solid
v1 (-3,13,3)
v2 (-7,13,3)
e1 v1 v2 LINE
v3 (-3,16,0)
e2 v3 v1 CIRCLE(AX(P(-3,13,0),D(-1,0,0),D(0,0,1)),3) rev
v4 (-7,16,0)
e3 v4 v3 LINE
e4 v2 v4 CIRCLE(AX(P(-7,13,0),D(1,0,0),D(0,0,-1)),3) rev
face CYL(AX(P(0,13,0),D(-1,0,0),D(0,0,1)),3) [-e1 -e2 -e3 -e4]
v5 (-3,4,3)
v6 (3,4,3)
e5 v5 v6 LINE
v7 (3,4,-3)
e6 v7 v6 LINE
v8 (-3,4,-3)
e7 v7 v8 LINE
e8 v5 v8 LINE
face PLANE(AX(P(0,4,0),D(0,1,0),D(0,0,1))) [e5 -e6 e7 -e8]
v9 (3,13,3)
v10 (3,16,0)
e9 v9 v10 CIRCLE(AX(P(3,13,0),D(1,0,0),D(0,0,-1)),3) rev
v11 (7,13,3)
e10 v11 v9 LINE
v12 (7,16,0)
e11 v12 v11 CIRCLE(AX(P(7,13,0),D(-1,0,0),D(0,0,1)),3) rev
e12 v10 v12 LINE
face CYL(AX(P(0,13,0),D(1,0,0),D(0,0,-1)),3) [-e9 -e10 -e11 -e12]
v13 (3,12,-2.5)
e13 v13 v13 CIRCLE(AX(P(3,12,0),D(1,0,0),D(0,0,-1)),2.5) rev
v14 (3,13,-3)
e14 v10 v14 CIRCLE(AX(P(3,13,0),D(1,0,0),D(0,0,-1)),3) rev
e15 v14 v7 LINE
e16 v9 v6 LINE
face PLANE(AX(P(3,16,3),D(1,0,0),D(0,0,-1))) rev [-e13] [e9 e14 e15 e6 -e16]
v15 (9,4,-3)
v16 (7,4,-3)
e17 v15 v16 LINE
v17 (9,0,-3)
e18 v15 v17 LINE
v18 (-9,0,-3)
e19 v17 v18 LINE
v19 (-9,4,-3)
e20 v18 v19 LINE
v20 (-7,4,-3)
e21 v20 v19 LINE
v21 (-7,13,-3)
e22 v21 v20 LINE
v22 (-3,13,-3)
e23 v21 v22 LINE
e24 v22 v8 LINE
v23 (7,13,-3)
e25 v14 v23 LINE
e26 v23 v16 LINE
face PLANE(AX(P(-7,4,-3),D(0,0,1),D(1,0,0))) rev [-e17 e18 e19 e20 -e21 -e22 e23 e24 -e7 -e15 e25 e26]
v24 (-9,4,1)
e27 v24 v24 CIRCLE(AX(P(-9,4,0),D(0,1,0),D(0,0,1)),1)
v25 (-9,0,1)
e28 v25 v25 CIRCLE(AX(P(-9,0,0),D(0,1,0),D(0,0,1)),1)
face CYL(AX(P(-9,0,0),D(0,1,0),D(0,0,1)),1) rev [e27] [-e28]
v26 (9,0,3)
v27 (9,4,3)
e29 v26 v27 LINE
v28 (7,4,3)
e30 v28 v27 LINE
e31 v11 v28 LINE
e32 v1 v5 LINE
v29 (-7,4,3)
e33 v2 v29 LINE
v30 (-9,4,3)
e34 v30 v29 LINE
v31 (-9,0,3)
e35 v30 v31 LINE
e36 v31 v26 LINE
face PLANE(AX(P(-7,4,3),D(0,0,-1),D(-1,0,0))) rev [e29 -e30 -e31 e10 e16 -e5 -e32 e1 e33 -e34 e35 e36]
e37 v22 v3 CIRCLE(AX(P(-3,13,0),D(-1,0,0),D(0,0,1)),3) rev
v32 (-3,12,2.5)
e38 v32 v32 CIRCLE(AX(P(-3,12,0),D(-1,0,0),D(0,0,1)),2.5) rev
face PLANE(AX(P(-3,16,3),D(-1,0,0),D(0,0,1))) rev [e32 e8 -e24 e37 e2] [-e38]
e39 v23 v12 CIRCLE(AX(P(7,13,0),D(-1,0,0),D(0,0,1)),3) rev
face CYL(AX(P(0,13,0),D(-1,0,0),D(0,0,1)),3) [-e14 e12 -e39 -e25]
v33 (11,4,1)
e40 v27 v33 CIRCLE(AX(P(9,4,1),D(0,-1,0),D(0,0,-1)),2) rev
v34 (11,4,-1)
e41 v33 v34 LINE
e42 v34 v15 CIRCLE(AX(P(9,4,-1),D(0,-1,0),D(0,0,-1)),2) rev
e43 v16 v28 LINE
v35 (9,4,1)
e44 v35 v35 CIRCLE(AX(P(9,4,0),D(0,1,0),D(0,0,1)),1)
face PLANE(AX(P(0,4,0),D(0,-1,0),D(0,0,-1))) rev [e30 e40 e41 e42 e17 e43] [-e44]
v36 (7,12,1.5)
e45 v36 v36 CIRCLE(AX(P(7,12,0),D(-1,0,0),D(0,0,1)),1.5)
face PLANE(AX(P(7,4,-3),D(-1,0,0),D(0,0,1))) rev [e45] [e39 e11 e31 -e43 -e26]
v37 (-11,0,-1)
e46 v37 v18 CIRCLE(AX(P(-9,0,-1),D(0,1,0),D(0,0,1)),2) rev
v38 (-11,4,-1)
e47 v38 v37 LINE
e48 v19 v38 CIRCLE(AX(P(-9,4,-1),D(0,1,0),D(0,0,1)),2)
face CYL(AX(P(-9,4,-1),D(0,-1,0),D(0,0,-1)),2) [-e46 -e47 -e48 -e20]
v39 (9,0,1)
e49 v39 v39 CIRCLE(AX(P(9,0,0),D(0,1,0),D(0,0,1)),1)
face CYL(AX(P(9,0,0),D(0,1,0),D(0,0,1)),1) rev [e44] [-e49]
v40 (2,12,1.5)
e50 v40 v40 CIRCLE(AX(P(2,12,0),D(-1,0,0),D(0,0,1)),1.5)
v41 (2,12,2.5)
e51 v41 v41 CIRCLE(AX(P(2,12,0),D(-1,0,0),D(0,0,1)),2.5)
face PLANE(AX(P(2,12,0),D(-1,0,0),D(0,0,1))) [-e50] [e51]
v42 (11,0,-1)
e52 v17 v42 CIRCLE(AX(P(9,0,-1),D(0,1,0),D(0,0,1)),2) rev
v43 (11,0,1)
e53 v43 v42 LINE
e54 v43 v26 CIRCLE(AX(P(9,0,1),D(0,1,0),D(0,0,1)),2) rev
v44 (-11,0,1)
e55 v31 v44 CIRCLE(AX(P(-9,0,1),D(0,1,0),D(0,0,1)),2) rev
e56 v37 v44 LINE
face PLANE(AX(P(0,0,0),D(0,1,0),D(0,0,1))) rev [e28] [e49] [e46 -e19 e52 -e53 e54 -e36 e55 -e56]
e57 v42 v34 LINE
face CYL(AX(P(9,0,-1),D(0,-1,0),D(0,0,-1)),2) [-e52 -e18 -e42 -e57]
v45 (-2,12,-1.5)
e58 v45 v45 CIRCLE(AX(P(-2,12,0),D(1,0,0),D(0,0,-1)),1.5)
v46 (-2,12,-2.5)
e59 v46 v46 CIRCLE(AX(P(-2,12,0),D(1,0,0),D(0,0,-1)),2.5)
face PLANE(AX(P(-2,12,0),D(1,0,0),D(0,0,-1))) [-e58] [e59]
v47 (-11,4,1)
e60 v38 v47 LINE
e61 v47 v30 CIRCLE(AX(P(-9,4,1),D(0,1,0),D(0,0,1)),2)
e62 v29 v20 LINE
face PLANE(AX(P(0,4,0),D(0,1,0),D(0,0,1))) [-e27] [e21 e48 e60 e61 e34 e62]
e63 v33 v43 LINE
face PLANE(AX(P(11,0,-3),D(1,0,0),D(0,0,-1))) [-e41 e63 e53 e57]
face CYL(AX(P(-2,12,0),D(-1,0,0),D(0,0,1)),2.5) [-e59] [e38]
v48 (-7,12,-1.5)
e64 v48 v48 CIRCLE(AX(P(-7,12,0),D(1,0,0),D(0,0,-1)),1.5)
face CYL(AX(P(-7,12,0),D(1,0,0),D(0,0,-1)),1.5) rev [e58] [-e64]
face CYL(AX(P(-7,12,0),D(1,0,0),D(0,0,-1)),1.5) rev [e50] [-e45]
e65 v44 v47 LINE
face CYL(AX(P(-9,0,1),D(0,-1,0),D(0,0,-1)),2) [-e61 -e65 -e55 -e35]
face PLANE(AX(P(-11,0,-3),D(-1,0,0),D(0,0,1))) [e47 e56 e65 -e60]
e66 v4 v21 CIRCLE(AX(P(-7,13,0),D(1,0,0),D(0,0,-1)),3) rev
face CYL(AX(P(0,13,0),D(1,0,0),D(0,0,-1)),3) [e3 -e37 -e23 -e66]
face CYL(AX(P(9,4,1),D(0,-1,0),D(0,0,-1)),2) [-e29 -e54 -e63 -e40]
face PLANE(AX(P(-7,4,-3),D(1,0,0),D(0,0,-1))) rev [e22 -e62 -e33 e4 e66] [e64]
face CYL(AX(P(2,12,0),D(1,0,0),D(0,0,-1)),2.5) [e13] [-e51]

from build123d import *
from build123d.topology import SkipClean

# Parameters (mm, degrees)
SKETCH2_W               = 14
SKETCH2_H               = 6
BOSS_EXTRUDE1_DEPTH     = 4
SKETCH3_W               = 4
SKETCH3_H               = 6
BOSS_EXTRUDE2_DEPTH     = 12
CUT_EXTRUDE1_DEPTH      = 22.470910554
CUT_EXTRUDE1_DEPTH_BACK = 22.470910554
SKETCH4_R               = 1.5
BOSS_EXTRUDE3_START     = 1
SKETCH5_R               = 2.5
SKETCH5_R_2             = 1.5
BOSS_EXTRUDE3_DEPTH     = 1
SKETCH6_R               = 2.5
SKETCH6_R_2             = 1.5
BOSS_EXTRUDE4_DEPTH     = 1
SKETCH7_W               = 4
SKETCH7_H               = 6
SKETCH7_R               = 1
BOSS_EXTRUDE5_DEPTH     = 4
FILLET1_R               = 2
FILLET2_R               = 3


with BuildPart() as part:
    # Sketch2 → Boss-Extrude1 (new body)
    with BuildSketch(Plane(origin=(0, 0, 0), x_dir=(1, 0, 0), z_dir=(0, 1, 0))):
        Rectangle(SKETCH2_W, SKETCH2_H)
    extrude(amount=BOSS_EXTRUDE1_DEPTH)

    # Sketch3 → Boss-Extrude2 (add)
    with BuildSketch(Plane(origin=(0, 4, 0), x_dir=(1, 0, 0), z_dir=(0, 1, 0))):
        with Locations((-5, 0)):
            Rectangle(SKETCH3_W, SKETCH3_H)
        with Locations((5, 0)):
            Rectangle(SKETCH3_W, SKETCH3_H)
    extrude(amount=BOSS_EXTRUDE2_DEPTH)

    # Sketch4 → Cut-Extrude1 (cut, two sides: drawn at the far end of the back side and taken through both)
    with BuildSketch(Plane(origin=(7, 0, 0), x_dir=(0, 0, -1), z_dir=(1, 0, 0)).offset(-CUT_EXTRUDE1_DEPTH_BACK)):
        with Locations((0, 12)):
            Circle(SKETCH4_R)
    extrude(amount=CUT_EXTRUDE1_DEPTH + CUT_EXTRUDE1_DEPTH_BACK, mode=Mode.SUBTRACT)

    # Sketch5 → Boss-Extrude3 (add)
    with BuildSketch(Plane(origin=(-3, 0, 0), x_dir=(0, 0, -1), z_dir=(1, 0, 0)).offset(BOSS_EXTRUDE3_START)):
        with Locations(Location((0, 12, 0), (0, 0, 180))):
            Circle(SKETCH5_R)
        with Locations((0, 12)):
            Circle(SKETCH5_R_2, mode=Mode.SUBTRACT)
    extrude(amount=-BOSS_EXTRUDE3_DEPTH)

    # Sketch6 → Boss-Extrude4 (add)
    with SkipClean():  # the faces are left unmerged after this step: merging them gives an invalid solid
        with BuildSketch(Plane.ZY.offset(-3)):
            with Locations((0, 12)):
                Circle(SKETCH6_R)
            with Locations((0, 12)):
                Circle(SKETCH6_R_2, mode=Mode.SUBTRACT)
        extrude(amount=BOSS_EXTRUDE4_DEPTH)

    # Sketch7 → Boss-Extrude5 (add)
    # profile 1 of 2: a face of its own
    with SkipClean():  # the faces are left unmerged after this step: merging them gives an invalid solid
        with BuildSketch(Plane(origin=(0, 4, 0), x_dir=(1, 0, 0), z_dir=(0, 1, 0))):
            with Locations((9, 0)):
                Rectangle(SKETCH7_W, SKETCH7_H)
            with Locations(Location((9, 0, 0), (0, 0, 270))):
                Circle(SKETCH7_R, mode=Mode.SUBTRACT)
        # profile 2 of 2: a face of its own
        with BuildSketch(Plane(origin=(0, 4, 0), x_dir=(1, 0, 0), z_dir=(0, 1, 0))):
            with Locations((-9, 0)):
                Rectangle(SKETCH7_W, SKETCH7_H)
            with Locations(Location((-9, 0, 0), (0, 0, 270))):
                Circle(SKETCH7_R, mode=Mode.SUBTRACT)
        extrude(amount=-BOSS_EXTRUDE5_DEPTH)

    # Fillet1
    fillet1_edges = [part.edges().sort_by_distance(p)[0] for p in [
        (11, 2, -3),
        (11, 2, 3),
        (-11, 2, 3),
        (-11, 2, -3),
    ]]
    fillet(fillet1_edges, radius=FILLET1_R)

    # Fillet2
    fillet2_edges = [part.edges().sort_by_distance(p)[0] for p in [
        (-5, 16, -3),
        (5, 16, -3),
        (5, 16, 3),
        (-5, 16, 3),
    ]]
    fillet(fillet2_edges, radius=FILLET2_R - 0.0001)  # a hair under: the kernel refuses the full size


solid = part.part
